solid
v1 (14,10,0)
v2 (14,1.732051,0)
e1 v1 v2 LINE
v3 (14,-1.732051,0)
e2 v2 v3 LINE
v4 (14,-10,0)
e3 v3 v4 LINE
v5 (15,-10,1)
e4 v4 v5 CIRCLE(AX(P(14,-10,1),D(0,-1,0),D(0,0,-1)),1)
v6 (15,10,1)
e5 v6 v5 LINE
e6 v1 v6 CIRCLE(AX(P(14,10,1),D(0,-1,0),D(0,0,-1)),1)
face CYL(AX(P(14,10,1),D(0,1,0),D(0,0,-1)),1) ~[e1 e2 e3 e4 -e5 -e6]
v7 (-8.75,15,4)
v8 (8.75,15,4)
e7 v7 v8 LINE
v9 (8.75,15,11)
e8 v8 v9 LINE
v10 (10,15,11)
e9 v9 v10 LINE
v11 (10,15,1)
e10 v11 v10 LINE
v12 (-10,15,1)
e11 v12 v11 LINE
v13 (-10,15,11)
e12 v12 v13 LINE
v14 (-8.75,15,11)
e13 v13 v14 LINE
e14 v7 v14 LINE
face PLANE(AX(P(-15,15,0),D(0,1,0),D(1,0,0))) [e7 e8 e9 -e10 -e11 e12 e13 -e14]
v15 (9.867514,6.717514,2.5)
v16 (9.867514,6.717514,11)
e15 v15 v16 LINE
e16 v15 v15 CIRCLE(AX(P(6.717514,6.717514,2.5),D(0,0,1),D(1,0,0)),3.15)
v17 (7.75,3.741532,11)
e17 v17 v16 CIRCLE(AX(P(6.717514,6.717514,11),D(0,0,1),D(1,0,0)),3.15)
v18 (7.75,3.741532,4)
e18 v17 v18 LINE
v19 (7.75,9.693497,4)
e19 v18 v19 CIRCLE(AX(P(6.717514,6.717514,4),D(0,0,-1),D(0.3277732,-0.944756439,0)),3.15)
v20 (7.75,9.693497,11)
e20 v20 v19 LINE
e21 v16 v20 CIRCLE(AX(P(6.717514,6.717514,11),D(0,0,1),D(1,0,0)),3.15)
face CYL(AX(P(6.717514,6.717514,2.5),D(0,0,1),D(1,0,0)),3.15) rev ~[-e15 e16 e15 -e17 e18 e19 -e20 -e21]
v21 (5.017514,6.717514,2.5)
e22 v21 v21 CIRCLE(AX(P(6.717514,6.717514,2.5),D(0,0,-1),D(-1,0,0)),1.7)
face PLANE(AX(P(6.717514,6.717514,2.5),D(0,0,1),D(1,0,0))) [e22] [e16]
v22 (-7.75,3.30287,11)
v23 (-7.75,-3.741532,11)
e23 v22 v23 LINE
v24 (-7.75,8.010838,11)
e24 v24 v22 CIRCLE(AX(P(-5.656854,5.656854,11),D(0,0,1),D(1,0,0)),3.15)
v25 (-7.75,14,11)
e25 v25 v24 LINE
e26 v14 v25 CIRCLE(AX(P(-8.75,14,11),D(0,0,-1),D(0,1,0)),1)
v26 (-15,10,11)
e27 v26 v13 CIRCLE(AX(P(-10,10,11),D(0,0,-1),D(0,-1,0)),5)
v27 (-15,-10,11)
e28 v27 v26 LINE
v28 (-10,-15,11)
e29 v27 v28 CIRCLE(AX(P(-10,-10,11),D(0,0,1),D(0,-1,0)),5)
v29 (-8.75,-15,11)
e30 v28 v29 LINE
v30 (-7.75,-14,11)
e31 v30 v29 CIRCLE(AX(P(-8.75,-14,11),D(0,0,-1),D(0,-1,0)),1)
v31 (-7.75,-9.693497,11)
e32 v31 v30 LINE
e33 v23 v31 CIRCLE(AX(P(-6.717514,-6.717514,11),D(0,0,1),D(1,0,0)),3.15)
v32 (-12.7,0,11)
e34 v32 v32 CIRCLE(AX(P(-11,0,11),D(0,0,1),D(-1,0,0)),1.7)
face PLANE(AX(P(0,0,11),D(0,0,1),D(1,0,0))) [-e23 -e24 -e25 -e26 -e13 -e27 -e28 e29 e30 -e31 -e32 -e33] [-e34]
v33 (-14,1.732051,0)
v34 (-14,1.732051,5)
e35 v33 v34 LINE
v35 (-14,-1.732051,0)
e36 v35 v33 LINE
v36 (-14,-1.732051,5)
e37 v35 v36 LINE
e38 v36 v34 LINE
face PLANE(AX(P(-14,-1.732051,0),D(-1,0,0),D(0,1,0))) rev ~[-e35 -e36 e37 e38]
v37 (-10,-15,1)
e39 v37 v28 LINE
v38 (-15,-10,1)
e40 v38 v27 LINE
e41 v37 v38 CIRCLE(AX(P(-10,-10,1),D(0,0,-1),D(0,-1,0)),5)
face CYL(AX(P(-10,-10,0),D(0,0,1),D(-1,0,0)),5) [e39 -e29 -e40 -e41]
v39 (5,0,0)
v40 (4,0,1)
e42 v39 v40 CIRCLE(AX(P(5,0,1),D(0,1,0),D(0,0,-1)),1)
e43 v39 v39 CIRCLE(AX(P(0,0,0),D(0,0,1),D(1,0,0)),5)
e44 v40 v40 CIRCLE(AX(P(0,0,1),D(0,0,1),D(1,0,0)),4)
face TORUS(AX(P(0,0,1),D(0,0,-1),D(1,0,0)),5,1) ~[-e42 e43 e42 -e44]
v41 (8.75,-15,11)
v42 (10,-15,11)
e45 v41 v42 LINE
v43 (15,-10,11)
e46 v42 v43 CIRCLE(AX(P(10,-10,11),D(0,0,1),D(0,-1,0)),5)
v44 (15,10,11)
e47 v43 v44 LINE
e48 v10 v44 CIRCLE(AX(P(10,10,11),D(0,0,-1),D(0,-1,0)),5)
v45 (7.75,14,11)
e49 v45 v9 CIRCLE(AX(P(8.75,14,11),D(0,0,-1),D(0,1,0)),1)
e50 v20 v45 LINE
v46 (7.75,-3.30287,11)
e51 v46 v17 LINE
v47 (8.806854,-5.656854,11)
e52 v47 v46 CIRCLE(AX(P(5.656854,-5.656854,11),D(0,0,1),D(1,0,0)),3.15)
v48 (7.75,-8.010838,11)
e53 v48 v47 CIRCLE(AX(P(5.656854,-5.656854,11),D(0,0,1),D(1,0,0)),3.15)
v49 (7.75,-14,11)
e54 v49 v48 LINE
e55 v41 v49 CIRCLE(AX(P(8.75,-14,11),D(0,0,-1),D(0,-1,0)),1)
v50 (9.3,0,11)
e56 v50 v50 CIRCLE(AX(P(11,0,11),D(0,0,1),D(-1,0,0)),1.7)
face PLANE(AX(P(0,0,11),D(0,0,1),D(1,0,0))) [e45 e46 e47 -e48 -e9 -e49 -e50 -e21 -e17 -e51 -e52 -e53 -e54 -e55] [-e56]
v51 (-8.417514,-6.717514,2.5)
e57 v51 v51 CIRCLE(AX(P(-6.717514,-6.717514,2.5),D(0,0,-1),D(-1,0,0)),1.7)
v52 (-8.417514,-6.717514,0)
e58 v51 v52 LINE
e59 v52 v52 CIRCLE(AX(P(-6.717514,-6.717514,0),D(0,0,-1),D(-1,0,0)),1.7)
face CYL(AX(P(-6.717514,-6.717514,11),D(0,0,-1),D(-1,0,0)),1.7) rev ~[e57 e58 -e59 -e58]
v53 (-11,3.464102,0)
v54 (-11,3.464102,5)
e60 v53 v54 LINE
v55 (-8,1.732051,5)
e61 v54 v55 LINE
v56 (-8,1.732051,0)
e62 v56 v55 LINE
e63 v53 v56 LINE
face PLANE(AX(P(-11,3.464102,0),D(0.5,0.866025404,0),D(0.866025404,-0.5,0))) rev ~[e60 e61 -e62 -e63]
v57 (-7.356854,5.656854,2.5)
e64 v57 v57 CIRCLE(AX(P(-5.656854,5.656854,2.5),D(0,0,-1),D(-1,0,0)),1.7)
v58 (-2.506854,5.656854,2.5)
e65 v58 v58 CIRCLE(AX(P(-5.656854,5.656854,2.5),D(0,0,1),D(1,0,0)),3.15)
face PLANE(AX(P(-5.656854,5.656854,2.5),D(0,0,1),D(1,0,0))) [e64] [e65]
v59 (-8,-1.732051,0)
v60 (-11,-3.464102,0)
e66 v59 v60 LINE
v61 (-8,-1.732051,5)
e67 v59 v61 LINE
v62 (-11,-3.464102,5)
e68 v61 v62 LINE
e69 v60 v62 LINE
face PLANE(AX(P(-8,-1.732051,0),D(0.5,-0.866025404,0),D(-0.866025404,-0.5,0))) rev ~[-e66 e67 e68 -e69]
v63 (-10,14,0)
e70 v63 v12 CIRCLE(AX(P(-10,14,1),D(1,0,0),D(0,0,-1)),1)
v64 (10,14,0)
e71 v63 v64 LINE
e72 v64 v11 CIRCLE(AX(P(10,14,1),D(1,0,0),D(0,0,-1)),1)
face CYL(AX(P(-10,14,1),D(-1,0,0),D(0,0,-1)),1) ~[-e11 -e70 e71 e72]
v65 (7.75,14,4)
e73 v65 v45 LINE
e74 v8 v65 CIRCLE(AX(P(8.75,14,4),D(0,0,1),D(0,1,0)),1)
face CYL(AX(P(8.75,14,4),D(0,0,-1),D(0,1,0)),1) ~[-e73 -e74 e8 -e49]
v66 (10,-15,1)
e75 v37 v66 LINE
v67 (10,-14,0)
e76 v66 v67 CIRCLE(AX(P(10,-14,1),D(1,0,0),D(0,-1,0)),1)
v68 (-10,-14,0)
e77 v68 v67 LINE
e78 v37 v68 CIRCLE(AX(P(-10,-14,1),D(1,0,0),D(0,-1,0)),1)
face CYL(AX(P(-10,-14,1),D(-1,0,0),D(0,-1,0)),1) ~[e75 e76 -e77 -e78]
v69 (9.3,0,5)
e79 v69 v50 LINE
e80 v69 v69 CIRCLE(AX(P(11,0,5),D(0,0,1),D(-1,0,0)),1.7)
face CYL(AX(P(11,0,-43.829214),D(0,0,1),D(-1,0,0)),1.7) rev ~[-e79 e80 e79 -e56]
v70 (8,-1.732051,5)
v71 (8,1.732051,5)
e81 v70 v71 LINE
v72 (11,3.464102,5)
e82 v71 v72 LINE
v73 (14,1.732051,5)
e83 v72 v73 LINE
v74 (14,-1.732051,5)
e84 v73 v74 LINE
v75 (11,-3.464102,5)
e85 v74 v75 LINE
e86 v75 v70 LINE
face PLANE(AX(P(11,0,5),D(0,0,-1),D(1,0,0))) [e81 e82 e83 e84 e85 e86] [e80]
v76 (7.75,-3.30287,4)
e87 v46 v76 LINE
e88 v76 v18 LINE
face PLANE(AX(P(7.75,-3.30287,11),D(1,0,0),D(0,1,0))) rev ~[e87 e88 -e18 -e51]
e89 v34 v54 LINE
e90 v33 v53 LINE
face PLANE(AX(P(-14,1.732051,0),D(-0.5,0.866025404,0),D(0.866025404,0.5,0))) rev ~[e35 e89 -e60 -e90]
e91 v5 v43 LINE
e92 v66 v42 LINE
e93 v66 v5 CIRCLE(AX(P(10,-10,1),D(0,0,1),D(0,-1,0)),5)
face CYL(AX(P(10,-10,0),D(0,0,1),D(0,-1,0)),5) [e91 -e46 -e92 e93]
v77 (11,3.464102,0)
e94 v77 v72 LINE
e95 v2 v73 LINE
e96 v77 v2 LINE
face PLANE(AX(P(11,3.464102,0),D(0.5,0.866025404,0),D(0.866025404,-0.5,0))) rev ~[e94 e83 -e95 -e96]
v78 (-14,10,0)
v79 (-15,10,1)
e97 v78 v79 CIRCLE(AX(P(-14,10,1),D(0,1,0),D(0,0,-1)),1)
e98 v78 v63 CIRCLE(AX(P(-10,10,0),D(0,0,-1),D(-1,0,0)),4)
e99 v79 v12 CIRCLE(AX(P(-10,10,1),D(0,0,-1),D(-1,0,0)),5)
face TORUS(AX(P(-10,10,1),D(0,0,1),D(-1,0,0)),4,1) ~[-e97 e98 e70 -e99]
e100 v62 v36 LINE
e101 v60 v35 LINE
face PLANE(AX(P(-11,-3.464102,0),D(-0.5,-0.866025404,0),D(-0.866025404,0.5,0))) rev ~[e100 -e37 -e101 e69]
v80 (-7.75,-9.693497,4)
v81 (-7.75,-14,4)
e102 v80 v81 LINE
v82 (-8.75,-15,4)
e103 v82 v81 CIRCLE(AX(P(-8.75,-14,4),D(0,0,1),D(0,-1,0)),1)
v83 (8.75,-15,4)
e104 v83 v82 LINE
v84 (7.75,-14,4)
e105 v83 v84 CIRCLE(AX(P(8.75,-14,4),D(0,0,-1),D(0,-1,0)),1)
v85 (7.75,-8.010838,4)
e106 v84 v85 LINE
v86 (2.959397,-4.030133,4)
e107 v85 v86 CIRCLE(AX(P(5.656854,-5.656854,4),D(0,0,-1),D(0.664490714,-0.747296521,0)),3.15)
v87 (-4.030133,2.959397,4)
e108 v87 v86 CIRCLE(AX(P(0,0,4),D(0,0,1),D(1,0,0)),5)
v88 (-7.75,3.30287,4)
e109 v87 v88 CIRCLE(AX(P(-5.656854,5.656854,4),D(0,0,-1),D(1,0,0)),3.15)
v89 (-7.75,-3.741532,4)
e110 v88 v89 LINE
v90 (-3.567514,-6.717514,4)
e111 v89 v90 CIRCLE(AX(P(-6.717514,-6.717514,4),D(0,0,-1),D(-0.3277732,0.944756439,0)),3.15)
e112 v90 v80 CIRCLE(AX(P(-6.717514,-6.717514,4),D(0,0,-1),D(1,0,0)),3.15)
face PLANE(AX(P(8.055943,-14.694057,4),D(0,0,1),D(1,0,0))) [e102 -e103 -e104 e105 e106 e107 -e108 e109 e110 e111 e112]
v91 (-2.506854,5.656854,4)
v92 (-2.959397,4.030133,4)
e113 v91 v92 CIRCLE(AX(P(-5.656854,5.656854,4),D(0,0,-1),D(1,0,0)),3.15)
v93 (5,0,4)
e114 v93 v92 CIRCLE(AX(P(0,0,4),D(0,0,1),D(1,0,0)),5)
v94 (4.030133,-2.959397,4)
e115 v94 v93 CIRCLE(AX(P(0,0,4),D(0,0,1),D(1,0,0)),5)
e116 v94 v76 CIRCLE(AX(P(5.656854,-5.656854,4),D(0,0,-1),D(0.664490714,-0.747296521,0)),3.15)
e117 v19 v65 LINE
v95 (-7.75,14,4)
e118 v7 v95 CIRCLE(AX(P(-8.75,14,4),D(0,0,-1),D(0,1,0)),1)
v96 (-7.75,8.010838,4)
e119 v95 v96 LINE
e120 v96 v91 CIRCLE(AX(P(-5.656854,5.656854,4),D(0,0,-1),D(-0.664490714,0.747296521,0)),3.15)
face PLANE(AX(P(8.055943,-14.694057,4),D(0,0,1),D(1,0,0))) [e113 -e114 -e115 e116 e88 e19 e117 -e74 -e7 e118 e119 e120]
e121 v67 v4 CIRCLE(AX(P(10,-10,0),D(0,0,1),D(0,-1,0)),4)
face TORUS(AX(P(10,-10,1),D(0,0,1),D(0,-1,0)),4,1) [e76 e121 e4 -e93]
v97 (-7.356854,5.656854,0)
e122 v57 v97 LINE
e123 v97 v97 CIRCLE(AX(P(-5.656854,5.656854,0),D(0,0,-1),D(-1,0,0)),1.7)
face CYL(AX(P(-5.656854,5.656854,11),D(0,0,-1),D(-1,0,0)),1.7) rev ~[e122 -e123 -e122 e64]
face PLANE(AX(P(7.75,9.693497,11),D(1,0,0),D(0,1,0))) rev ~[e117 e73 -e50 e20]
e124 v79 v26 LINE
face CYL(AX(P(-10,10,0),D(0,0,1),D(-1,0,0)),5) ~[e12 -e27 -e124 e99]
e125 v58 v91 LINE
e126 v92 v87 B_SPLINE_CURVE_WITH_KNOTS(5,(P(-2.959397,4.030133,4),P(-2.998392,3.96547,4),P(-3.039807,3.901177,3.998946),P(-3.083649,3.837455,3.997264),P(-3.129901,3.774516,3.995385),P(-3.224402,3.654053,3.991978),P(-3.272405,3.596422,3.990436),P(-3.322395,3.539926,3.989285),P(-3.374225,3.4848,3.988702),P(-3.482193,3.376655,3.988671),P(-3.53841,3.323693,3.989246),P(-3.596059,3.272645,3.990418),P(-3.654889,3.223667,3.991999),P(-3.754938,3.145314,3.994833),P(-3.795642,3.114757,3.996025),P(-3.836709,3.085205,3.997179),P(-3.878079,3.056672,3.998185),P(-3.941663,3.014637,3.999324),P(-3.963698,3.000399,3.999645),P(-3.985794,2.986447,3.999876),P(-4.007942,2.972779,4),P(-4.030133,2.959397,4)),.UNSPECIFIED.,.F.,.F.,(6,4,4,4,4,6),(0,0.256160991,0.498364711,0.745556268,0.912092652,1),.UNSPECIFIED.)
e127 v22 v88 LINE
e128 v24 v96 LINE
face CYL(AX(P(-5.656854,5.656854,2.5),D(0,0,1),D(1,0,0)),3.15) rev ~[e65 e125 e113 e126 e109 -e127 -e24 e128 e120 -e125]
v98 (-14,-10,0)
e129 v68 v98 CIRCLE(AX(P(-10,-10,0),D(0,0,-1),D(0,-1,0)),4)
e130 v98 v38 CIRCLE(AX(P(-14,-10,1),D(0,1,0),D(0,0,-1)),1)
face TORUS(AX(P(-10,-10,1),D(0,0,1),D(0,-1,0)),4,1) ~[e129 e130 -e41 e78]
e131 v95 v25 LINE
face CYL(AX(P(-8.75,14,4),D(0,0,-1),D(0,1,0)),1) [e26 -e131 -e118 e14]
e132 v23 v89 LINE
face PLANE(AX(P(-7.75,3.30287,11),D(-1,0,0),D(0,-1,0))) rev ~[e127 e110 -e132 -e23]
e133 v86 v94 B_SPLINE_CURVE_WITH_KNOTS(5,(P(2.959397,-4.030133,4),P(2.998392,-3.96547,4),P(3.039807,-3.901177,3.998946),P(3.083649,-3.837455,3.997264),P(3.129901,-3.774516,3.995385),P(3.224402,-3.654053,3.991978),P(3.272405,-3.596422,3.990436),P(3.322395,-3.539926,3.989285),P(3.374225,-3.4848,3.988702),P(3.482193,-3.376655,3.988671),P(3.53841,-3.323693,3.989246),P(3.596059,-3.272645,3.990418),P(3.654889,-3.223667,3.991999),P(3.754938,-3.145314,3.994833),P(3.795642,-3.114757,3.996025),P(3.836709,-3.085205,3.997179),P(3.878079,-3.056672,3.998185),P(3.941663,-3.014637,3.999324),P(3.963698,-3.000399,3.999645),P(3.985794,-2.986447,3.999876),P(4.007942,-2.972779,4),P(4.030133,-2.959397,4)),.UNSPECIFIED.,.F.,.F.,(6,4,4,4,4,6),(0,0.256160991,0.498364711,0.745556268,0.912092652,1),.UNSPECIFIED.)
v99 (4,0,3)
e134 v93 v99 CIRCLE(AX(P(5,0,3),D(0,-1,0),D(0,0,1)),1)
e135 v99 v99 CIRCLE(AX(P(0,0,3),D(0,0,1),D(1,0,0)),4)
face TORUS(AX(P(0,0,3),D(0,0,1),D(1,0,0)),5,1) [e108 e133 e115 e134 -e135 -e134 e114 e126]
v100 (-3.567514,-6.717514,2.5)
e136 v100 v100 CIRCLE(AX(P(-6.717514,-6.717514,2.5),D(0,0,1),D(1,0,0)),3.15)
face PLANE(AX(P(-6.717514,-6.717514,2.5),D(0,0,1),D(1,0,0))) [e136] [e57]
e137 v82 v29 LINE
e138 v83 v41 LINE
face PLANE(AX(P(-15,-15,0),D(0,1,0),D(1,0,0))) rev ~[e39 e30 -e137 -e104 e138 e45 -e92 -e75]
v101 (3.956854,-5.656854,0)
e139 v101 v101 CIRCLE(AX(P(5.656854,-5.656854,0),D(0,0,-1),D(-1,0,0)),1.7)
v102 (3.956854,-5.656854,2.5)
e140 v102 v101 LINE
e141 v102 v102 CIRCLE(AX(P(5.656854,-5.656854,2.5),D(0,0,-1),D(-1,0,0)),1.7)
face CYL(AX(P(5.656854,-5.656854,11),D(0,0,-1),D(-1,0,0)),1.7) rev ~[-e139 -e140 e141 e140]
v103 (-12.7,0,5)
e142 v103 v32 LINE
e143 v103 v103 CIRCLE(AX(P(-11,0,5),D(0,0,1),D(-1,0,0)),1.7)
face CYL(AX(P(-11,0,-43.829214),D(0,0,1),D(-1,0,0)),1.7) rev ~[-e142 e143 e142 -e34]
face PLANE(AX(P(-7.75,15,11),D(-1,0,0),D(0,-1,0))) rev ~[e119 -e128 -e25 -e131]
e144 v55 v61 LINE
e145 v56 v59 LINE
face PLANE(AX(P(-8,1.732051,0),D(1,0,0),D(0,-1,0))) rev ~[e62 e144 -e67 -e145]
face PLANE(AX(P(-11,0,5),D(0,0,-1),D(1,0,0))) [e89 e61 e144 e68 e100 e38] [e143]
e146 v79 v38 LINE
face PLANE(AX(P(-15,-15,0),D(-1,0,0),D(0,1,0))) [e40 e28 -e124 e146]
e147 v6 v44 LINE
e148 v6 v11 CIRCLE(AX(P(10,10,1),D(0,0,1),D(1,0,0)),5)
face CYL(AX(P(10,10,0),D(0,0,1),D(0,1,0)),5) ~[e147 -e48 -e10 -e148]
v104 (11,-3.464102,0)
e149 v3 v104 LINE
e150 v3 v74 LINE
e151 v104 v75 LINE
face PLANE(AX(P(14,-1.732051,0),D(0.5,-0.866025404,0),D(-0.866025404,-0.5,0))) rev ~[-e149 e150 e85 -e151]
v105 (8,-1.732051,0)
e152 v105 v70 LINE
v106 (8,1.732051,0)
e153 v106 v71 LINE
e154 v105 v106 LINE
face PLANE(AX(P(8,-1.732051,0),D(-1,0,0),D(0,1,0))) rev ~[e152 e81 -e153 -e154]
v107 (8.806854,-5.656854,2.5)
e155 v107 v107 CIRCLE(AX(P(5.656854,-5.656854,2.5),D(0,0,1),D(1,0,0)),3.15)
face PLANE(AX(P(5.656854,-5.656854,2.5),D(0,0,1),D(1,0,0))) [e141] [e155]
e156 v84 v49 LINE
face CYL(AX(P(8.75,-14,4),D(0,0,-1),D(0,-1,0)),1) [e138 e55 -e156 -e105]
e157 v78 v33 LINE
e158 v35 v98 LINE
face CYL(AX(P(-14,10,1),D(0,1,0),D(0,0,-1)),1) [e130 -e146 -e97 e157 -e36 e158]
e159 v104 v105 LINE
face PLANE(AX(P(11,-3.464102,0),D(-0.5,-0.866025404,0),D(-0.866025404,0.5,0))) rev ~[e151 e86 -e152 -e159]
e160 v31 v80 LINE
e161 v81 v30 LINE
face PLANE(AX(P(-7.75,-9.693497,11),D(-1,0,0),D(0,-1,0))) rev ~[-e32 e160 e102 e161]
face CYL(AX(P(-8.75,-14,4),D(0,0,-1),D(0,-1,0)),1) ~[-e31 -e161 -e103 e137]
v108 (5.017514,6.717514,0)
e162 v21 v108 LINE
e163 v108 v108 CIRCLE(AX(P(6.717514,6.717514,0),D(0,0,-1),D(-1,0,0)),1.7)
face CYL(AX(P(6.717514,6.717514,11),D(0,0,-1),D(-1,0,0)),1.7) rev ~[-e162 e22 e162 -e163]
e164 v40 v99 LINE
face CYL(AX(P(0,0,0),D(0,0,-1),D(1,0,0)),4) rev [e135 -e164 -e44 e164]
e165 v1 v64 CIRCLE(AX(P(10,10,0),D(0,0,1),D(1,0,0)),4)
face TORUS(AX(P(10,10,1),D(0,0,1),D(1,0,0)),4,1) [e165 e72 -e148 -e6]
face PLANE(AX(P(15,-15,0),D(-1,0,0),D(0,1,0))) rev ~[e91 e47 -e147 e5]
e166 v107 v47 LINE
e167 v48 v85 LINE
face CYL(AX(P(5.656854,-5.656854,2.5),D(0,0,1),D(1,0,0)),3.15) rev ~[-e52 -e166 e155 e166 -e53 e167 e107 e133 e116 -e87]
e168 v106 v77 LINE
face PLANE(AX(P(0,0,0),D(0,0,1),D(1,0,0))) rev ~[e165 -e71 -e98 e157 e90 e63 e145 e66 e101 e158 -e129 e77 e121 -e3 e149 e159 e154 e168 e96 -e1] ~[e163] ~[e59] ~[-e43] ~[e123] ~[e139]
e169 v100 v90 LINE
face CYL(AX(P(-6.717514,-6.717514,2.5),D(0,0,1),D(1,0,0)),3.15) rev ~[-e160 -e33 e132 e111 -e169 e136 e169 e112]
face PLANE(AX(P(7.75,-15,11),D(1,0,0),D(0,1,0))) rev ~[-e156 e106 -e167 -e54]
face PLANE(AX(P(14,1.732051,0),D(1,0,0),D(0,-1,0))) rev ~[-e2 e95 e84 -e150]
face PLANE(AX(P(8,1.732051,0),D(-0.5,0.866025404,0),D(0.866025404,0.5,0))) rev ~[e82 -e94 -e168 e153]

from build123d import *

# Parameters (mm, degrees)
F0_W           = 30
F0_H           = 30
F0_R           = 4
F1_DEPTH       = 11
F3_D           = 3.4
F3_CBORE_D     = 6.3
F3_CBORE_DEPTH = 8.5
F5_D           = 3.4
F6_DEPTH       = 5
F7_R           = 4
F8_DEPTH       = 7
F9_R           = 5
F10_T1_DEPTH   = 9.5
F10_T3_DEPTH   = 20
F10_T5_DEPTH   = 20
F10_T12_ANGLE  = 90
F10_T14_ANGLE  = 90
F10_T16_ANGLE  = 90
F10_T18_ANGLE  = 90


# Not quite as in the source:
# - a fillet or chamfer that OpenCascade refuses, or shapes differently, is made with other operations: its cross-section is extruded or revolved along the edge and cut away or added


with BuildPart() as f1:
    # F0 (on Top) → F1 (new body)
    with BuildSketch(Plane.XY):
        Rectangle(F0_W, F0_H)
        Circle(F0_R, mode=Mode.SUBTRACT)
    extrude(amount=F1_DEPTH)

    # F3 (through all)
    with Locations(Plane.XY.offset(11)):
        with Locations((-6.7175144213, -6.7175144213), (-5.6568542495, 5.6568542495), (6.7175144213, 6.7175144213), (5.6568542495, -5.6568542495)):
            CounterBoreHole(F3_D / 2, F3_CBORE_D / 2, F3_CBORE_DEPTH)

    # F5 (through all)
    with Locations(Plane(origin=(0, 0, 0), x_dir=(1, 0, 0), z_dir=(0, 0, -1))):
        with Locations((-11, 0), (11, 0)):
            Hole(F5_D / 2)

    # F4 (on face) → F6 (cut)
    with BuildSketch(Plane(origin=(0, 0, 0), x_dir=(1, 0, 0), z_dir=(0, 0, -1))):
        Polygon((14, -1.7320508076), (14, 1.7320508076), (11, 3.4641016151), (8, 1.7320508076), (8, -1.7320508076), (11, -3.4641016151), align=None)
        Polygon((-8, -1.7320508076), (-8, 1.7320508076), (-11, 3.4641016151), (-14, 1.7320508076), (-14, -1.7320508076), (-11, -3.4641016151), align=None)
    extrude(amount=-F6_DEPTH, mode=Mode.SUBTRACT)

    # F7 (on face) → F8 (cut)
    with BuildSketch(Plane.XY.offset(11)):
        with BuildLine():
            Line((-7.75, -15), (7.75, -15))
            Line((7.75, -15), (7.75, -8.0108382909))
            ThreePointArc((7.75, -8.0108382909), (2.5068542495, -5.6568542495), (7.75, -3.3028702081))
            Line((7.75, -3.3028702081), (7.75, 3.7415316374))
            ThreePointArc((7.75, 3.7415316374), (3.5675144213, 6.7175144213), (7.75, 9.6934972051))
            Line((7.75, 9.6934972051), (7.75, 15))
            Line((7.75, 15), (-7.75, 15))
            Line((-7.75, 15), (-7.75, 8.0108382909))
            ThreePointArc((-7.75, 8.0108382909), (-4.3666816087, 8.5305199498), (-2.5068542495, 5.6568542495))
            ThreePointArc((-2.5068542495, 5.6568542495), (-4.3666816087, 2.7831885492), (-7.75, 3.3028702081))
            Line((-7.75, 3.3028702081), (-7.75, -3.7415316374))
            ThreePointArc((-7.75, -3.7415316374), (-4.8912928538, -4.1509184682), (-3.5675144213, -6.7175144213))
            ThreePointArc((-3.5675144213, -6.7175144213), (-4.8912928538, -9.2841103744), (-7.75, -9.6934972051))
            Line((-7.75, -9.6934972051), (-7.75, -15))
        make_face()
        Circle(F7_R, mode=Mode.SUBTRACT)
    extrude(amount=-F8_DEPTH, mode=Mode.SUBTRACT)

    # F9
    f9_edges = [f1.edges().sort_by_distance(p)[0] for p in [
        (15, 15, 5.5),
        (-15, 15, 5.5),
        (15, -15, 5.5),
        (-15, -15, 5.5),
    ]]
    fillet(f9_edges, radius=F9_R)

    # F10: fillet of radius 1 on 15 edges, made by hand

    # F10_s2 → F10_t1 (cut)
    with BuildSketch(Plane.XY.offset(4)):
        with BuildLine():
            ThreePointArc((8.75, 15), (8.0428932188, 14.7071067812), (7.75, 14))
            Line((7.75, 14), (7.75, 15))
            Line((7.75, 15), (8.75, 15))
        make_face()
        with BuildLine():
            ThreePointArc((-8.75, 15), (-8.0428932188, 14.7071067812), (-7.75, 14))
            Line((-7.75, 14), (-7.75, 15))
            Line((-7.75, 15), (-8.75, 15))
        make_face()
        with BuildLine():
            ThreePointArc((8.75, -15), (8.0428932188, -14.7071067812), (7.75, -14))
            Line((7.75, -14), (7.75, -15))
            Line((7.75, -15), (8.75, -15))
        make_face()
        with BuildLine():
            ThreePointArc((-8.75, -15), (-8.0428932188, -14.7071067812), (-7.75, -14))
            Line((-7.75, -14), (-7.75, -15))
            Line((-7.75, -15), (-8.75, -15))
        make_face()
    extrude(amount=F10_T1_DEPTH, mode=Mode.SUBTRACT)

    # F10_s4 → F10_t3 (cut)
    with BuildSketch(Plane.YZ.offset(-10)):
        with BuildLine():
            ThreePointArc((-15, 1), (-14.7071067812, 0.2928932188), (-14, 0))
            Line((-14, 0), (-15, 0))
            Line((-15, 0), (-15, 1))
        make_face()
        with BuildLine():
            ThreePointArc((14, 0), (14.7071067812, 0.2928932188), (15, 1))
            Line((15, 1), (15, 0))
            Line((15, 0), (14, 0))
        make_face()
    extrude(amount=F10_T3_DEPTH, mode=Mode.SUBTRACT)

    # F10_s6 → F10_t5 (cut)
    with BuildSketch(Plane.XZ.offset(-10)):
        with BuildLine():
            ThreePointArc((-14, 0), (-14.7071067812, 0.2928932188), (-15, 1))
            Line((-15, 1), (-15, 0))
            Line((-15, 0), (-14, 0))
        make_face()
        with BuildLine():
            ThreePointArc((14, 0), (14.7071067812, 0.2928932188), (15, 1))
            Line((15, 1), (15, 0))
            Line((15, 0), (14, 0))
        make_face()
    extrude(amount=F10_T5_DEPTH, mode=Mode.SUBTRACT)

    # F10_s7 → F10_t8 (revolve, cut)
    with BuildSketch(Plane.XZ):
        with BuildLine():
            ThreePointArc((5, 4), (4.2928932188, 3.7071067812), (4, 3))
            Line((4, 3), (4, 4))
            Line((4, 4), (5, 4))
        make_face()
    revolve(axis=Axis((0, 0, 4), (0, 0, 1)), mode=Mode.SUBTRACT)

    # F10_s9 → F10_t10 (revolve, cut)
    with BuildSketch(Plane.XZ):
        with BuildLine():
            ThreePointArc((5, 0), (4.2928932188, 0.2928932188), (4, 1))
            Line((4, 1), (4, 0))
            Line((4, 0), (5, 0))
        make_face()
    revolve(axis=Axis((0, 0, 0), (0, 0, 1)), mode=Mode.SUBTRACT)

    # F10_s11 → F10_t12 (revolve, cut)
    with BuildSketch(Plane.YZ.offset(-10)):
        with BuildLine():
            ThreePointArc((-14, 0), (-14.7071067812, 0.2928932188), (-15, 1))
            Line((-15, 1), (-15, 0))
            Line((-15, 0), (-14, 0))
        make_face()
    revolve(axis=Axis((-10, -10, 0), (0, 0, -1)), revolution_arc=F10_T12_ANGLE, mode=Mode.SUBTRACT)

    # F10_s13 → F10_t14 (revolve, cut)
    with BuildSketch(Plane.YZ.offset(10)):
        with BuildLine():
            ThreePointArc((-14, 0), (-14.7071067812, 0.2928932188), (-15, 1))
            Line((-15, 1), (-15, 0))
            Line((-15, 0), (-14, 0))
        make_face()
    revolve(axis=Axis((10, -10, 0), (0, 0, 1)), revolution_arc=F10_T14_ANGLE, mode=Mode.SUBTRACT)

    # F10_s15 → F10_t16 (revolve, cut)
    with BuildSketch(Plane.XZ.offset(-10)):
        with BuildLine():
            ThreePointArc((-14, 0), (-14.7071067812, 0.2928932188), (-15, 1))
            Line((-15, 1), (-15, 0))
            Line((-15, 0), (-14, 0))
        make_face()
    revolve(axis=Axis((-10, 10, 0), (0, 0, -1)), revolution_arc=F10_T16_ANGLE, mode=Mode.SUBTRACT)

    # F10_s17 → F10_t18 (revolve, cut)
    with BuildSketch(Plane.XZ.offset(-10)):
        with BuildLine():
            ThreePointArc((14, 0), (14.7071067812, 0.2928932188), (15, 1))
            Line((15, 1), (15, 0))
            Line((15, 0), (14, 0))
        make_face()
    revolve(axis=Axis((10, 10, 0), (0, 0, 1)), revolution_arc=F10_T18_ANGLE, mode=Mode.SUBTRACT)


solid = f1.part
